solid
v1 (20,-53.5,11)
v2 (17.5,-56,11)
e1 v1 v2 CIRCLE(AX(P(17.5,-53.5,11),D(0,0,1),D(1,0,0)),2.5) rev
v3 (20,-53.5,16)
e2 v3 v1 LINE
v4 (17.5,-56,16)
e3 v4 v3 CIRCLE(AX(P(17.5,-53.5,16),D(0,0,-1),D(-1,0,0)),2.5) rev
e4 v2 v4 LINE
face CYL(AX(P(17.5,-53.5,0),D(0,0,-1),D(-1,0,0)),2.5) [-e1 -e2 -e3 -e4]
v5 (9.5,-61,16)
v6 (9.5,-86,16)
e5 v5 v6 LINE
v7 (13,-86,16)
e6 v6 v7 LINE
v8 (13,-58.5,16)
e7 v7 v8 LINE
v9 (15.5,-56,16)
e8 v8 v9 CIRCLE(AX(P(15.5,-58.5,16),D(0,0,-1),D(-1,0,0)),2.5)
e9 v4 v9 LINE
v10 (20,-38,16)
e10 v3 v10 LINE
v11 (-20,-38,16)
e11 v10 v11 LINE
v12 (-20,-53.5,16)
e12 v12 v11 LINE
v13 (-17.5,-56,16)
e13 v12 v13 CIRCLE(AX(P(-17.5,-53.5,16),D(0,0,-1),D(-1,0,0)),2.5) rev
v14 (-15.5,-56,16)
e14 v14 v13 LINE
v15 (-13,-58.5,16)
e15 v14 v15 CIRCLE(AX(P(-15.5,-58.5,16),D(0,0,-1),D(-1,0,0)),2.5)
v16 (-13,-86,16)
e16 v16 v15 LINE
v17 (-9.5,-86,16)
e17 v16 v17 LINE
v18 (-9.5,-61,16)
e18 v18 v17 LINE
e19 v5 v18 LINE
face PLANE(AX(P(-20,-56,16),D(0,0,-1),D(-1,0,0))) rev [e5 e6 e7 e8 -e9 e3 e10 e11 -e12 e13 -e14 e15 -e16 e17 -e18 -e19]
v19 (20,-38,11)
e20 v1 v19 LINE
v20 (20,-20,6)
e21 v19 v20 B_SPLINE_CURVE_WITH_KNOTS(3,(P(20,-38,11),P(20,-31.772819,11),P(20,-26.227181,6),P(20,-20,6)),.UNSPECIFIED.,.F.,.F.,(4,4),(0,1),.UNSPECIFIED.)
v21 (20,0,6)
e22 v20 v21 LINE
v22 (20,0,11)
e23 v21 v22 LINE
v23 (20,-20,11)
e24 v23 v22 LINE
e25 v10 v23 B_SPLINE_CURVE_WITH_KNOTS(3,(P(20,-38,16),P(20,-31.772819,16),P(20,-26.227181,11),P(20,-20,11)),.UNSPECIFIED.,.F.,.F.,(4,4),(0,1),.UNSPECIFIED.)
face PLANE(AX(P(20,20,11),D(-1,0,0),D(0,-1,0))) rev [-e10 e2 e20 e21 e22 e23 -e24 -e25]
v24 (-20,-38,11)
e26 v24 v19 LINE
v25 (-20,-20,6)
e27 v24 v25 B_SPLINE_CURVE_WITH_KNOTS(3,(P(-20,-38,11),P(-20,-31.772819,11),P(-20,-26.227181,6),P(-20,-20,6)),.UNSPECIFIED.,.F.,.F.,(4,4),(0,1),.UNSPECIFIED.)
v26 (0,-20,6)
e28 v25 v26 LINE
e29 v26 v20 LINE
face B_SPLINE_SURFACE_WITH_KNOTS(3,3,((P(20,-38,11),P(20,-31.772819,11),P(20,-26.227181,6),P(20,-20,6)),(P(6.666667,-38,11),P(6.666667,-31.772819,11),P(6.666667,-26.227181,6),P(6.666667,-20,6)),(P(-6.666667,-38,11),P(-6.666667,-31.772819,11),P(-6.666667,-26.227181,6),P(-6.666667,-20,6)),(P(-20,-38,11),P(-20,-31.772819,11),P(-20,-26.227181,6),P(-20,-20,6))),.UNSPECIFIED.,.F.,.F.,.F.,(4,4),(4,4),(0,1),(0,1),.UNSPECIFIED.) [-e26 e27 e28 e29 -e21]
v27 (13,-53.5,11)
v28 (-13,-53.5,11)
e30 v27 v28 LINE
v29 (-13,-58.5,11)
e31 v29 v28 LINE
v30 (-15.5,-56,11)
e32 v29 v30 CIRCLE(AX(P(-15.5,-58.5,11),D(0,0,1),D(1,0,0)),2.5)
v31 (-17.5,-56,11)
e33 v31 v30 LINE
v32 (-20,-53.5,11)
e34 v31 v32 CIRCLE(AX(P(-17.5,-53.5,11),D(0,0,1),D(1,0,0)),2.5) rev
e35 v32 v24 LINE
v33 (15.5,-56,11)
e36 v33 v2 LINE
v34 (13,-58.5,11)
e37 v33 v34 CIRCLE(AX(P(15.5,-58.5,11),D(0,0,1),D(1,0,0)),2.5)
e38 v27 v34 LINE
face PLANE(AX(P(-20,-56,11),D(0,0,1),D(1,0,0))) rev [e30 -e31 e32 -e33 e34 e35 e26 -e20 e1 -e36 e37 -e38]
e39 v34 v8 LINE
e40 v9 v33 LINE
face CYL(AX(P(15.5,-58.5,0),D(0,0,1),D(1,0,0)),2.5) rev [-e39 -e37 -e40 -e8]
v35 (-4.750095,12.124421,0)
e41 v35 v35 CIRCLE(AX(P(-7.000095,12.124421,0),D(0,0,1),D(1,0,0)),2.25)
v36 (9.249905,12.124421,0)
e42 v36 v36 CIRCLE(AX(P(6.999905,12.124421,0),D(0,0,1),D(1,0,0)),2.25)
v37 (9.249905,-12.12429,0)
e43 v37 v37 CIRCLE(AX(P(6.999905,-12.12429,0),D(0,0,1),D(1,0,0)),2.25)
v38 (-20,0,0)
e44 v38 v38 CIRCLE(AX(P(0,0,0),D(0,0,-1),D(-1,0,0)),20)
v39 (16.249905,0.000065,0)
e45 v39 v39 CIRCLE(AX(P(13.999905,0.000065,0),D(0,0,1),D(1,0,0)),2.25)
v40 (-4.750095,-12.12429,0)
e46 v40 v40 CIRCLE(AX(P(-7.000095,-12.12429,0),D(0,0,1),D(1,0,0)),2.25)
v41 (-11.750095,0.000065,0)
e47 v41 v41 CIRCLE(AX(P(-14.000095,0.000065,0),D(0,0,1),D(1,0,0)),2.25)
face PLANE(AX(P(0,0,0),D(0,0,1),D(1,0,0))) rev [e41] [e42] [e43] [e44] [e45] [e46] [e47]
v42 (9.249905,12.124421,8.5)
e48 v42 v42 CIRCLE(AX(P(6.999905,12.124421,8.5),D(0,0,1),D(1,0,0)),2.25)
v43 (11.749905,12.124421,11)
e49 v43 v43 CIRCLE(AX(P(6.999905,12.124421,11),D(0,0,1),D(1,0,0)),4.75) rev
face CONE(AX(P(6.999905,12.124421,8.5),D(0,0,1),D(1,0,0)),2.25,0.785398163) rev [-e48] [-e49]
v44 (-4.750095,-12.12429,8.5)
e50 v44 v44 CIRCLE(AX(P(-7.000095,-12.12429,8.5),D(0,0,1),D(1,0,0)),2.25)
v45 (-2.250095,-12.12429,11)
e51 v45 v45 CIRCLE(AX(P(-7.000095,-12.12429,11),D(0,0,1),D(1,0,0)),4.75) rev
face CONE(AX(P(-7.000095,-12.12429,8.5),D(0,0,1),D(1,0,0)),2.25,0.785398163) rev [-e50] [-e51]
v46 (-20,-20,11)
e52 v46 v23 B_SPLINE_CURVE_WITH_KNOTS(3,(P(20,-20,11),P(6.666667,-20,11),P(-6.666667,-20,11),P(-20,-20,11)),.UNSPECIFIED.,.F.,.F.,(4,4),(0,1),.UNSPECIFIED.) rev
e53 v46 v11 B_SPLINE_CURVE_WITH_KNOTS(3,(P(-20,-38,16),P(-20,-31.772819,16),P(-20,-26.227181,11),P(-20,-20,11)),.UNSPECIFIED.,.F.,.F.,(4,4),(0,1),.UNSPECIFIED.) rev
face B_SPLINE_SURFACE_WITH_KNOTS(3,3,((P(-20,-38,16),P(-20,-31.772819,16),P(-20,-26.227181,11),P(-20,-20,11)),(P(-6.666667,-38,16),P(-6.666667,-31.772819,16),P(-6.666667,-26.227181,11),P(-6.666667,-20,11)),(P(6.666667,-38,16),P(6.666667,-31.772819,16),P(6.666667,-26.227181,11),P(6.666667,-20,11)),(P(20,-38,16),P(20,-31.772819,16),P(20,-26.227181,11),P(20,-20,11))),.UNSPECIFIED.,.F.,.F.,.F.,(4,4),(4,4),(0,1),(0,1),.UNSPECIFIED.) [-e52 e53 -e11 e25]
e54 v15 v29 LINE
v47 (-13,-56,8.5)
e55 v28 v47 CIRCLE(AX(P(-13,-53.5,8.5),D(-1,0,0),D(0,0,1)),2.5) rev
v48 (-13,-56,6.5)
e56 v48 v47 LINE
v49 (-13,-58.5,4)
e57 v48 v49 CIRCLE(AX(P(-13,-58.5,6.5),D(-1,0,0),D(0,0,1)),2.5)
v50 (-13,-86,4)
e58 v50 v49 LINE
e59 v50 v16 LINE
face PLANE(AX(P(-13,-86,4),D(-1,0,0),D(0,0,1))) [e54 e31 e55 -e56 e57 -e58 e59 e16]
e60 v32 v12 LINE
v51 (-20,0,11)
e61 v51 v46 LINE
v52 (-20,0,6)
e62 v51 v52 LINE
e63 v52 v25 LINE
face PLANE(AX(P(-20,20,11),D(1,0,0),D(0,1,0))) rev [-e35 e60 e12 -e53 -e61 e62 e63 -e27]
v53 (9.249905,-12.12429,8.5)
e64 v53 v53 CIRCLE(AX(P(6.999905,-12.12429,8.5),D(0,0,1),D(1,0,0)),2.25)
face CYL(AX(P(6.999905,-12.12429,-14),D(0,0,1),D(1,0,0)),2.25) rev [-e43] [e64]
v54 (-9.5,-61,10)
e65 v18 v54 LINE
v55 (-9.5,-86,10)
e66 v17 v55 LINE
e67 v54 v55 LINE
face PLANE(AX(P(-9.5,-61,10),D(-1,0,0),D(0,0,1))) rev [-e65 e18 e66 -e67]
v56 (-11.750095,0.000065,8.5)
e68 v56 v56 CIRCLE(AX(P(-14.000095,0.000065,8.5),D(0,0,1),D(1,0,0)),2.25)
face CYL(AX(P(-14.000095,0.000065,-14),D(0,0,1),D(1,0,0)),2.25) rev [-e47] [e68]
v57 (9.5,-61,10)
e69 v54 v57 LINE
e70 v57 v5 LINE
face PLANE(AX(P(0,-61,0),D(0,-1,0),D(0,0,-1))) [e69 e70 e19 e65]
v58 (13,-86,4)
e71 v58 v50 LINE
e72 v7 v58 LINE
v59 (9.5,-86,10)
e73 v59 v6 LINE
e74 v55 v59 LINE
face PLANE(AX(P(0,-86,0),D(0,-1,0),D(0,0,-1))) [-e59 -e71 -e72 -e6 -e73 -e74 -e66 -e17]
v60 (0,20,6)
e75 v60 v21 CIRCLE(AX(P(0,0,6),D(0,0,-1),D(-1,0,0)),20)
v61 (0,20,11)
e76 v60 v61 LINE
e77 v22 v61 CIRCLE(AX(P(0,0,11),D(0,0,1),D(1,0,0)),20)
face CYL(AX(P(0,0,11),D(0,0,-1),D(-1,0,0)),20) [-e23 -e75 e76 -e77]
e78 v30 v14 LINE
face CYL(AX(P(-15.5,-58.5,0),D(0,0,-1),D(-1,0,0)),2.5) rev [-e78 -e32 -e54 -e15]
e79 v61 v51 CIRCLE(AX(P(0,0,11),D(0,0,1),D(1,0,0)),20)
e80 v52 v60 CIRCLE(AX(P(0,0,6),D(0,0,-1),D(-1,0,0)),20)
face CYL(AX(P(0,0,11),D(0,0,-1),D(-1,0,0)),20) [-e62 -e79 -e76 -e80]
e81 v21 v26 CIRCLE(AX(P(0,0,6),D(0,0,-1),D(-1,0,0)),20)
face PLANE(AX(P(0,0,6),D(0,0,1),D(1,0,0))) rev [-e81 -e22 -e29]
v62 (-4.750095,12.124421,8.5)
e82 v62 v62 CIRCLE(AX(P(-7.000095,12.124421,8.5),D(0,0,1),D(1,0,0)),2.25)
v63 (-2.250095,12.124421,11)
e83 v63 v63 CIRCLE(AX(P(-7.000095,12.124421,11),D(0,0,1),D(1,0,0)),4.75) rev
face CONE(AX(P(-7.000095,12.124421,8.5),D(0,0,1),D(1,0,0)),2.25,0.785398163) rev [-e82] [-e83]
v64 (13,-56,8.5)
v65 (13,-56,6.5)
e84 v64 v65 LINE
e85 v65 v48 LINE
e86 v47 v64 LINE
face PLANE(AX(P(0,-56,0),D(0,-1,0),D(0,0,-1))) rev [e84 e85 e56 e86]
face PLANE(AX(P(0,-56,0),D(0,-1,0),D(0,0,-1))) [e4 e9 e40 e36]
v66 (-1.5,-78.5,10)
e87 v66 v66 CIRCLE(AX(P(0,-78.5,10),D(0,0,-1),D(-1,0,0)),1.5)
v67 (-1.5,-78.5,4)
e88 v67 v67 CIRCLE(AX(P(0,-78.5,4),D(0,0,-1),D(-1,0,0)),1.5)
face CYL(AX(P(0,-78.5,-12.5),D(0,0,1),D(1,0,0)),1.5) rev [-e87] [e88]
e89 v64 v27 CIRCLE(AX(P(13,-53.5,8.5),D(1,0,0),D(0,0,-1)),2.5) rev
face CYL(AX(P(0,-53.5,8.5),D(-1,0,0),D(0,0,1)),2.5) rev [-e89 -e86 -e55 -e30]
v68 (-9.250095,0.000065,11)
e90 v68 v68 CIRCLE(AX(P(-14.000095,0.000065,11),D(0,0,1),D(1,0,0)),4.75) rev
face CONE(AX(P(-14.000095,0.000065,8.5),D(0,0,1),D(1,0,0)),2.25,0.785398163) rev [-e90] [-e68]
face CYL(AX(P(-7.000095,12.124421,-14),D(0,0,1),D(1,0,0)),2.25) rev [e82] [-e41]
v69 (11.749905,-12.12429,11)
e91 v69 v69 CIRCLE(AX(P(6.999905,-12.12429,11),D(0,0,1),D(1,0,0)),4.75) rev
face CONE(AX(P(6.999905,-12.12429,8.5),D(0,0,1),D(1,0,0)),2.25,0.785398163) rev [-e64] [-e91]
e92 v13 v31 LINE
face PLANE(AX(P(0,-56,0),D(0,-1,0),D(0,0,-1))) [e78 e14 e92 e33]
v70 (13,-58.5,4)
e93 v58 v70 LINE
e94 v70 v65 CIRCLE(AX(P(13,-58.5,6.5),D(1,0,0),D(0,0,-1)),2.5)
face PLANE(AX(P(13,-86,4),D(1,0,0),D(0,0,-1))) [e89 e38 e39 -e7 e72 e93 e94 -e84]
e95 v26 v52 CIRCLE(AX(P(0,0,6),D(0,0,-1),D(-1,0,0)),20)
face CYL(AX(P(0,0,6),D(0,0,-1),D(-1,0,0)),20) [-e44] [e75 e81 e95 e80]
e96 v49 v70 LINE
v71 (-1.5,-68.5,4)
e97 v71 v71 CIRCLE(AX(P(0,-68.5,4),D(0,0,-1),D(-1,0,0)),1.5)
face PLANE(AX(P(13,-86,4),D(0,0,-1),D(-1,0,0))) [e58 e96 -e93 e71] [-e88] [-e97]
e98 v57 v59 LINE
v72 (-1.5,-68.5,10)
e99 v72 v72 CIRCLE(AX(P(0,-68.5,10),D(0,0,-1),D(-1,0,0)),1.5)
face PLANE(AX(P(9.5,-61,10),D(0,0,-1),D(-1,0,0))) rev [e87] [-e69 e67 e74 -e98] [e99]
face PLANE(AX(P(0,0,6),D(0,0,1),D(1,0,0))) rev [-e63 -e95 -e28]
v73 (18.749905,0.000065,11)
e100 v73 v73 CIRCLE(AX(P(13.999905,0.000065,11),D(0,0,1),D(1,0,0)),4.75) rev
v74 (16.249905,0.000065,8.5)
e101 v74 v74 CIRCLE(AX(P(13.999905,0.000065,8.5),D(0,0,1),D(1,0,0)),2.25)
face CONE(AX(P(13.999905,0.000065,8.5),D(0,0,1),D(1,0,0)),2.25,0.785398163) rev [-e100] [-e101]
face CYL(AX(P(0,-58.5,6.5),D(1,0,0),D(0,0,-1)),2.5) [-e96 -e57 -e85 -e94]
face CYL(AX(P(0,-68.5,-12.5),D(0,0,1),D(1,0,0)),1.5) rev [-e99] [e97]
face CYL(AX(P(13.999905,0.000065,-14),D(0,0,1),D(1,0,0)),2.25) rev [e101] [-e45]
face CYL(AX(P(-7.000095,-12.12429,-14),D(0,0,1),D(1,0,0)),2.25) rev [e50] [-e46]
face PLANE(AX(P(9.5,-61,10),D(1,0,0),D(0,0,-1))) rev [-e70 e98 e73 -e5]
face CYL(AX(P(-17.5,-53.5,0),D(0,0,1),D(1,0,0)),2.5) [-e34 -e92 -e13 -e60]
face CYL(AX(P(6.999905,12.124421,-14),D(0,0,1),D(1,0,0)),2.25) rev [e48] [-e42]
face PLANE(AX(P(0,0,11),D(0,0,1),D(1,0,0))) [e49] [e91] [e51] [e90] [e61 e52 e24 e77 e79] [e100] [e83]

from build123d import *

# Parameters (mm, degrees)
SKETCH7_W           = 40
SKETCH7_H           = 40
BOSS_EXTRUDE1_DEPTH = 11
LOFT1_START         = -20
LOFT1_DEPTH         = 40
SKETCH16_W          = 49.026286786
SKETCH16_H          = 65.242270374
SKETCH16_R          = 20
CUT_EXTRUDE3_DEPTH  = 6
SKETCH17_W          = 40
SKETCH17_H          = 5
BOSS_EXTRUDE5_DEPTH = 18
SKETCH10_R          = 2.25
CUT_EXTRUDE1_DEPTH  = 25
CHAMFER1_SIZE       = 2.5
FILLET3_R           = 20
SKETCH11_W          = 26
SKETCH11_H          = 12
BOSS_EXTRUDE6_DEPTH = 30
SKETCH21_W          = 19
SKETCH21_H          = 6
CUT_EXTRUDE4_DEPTH  = 25
FILLET5_R           = 2.5
FILLET7_R           = 2.5
SKETCH22_R          = 1.5
CUT_EXTRUDE5_DEPTH  = 12.5


# Read off the part's stored shape, not the designer's step: Loft1
with BuildPart() as part:
    # Sketch7 → Boss-Extrude1 (new body)
    with BuildSketch(Plane.XY):
        Rectangle(SKETCH7_W, SKETCH7_H)
    extrude(amount=BOSS_EXTRUDE1_DEPTH)

    # Loft1 outline → Loft1 (add)
    with BuildSketch(Plane.YZ.offset(LOFT1_START)):
        with BuildLine():
            add(Edge.make_bspline(
                [(-38, 16), (-31.772819436, 16), (-26.227180564, 11), (-20, 11)],
                knots=[0, 0, 0, 0, 1, 1, 1, 1], degree=3))
            Line((-38, 16), (-38, 11))
            add(Edge.make_bspline(
                [(-38, 11), (-31.772819436, 11), (-26.227180564, 6), (-20, 6)],
                knots=[0, 0, 0, 0, 1, 1, 1, 1], degree=3))
            Line((-20, 6), (-20, 11))
        make_face()
    extrude(amount=LOFT1_DEPTH)

    # Sketch16 → Cut-Extrude3 (cut)
    with BuildSketch(Plane(origin=(0, 0, 0), x_dir=(-1, 0, 0), z_dir=(0, 0, -1))):
        Rectangle(SKETCH16_W, SKETCH16_H)
        Circle(SKETCH16_R, mode=Mode.SUBTRACT)
    extrude(amount=-CUT_EXTRUDE3_DEPTH, mode=Mode.SUBTRACT)

    # Sketch17 → Boss-Extrude5 (add)
    with BuildSketch(Plane(origin=(0, -38, 0), x_dir=(-1, 0, 0), z_dir=(0, -1, 0))):
        with Locations((0, -13.5)):
            Rectangle(SKETCH17_W, SKETCH17_H)
    extrude(amount=BOSS_EXTRUDE5_DEPTH)

    # Sketch10 → Cut-Extrude1 (cut)
    with BuildSketch(Plane.XY.offset(11)):
        with Locations((-7.00009521, 12.124420806)):
            Circle(SKETCH10_R)
        with Locations((6.99990479, 12.124420806)):
            Circle(SKETCH10_R)
        with Locations((13.99990479, 6.5153e-05)):
            Circle(SKETCH10_R)
        with Locations((6.99990479, -12.1242905)):
            Circle(SKETCH10_R)
        with Locations((-7.00009521, -12.1242905)):
            Circle(SKETCH10_R)
        with Locations((-14.00009521, 6.5153e-05)):
            Circle(SKETCH10_R)
    extrude(amount=-CUT_EXTRUDE1_DEPTH, mode=Mode.SUBTRACT)

    # Chamfer1
    chamfer1_edges = [part.edges().sort_by_distance(p)[0] for p in [
        (4.74990479, 12.124420806, 11),
        (-9.25009521, 12.124420806, 11),
        (-16.25009521, 6.5153e-05, 11),
        (-9.25009521, -12.1242905, 11),
        (4.74990479, -12.1242905, 11),
        (11.74990479, 6.5153e-05, 11),
    ]]
    chamfer(chamfer1_edges, length=CHAMFER1_SIZE)

    # Fillet3
    fillet3_edges = [part.edges().sort_by_distance(p)[0] for p in [
        (20, 20, 8.5),
        (-20, 20, 8.5),
    ]]
    fillet(fillet3_edges, radius=FILLET3_R - 0.0001)  # a hair under: the kernel refuses the full size

    # Sketch11 → Boss-Extrude6 (add)
    with BuildSketch(Plane(origin=(0, -56, -3.472963553), x_dir=(1, 0, 0), z_dir=(0, 1, 0))):
        with Locations((0, -13.472963553)):
            Rectangle(SKETCH11_W, SKETCH11_H)
    extrude(amount=-BOSS_EXTRUDE6_DEPTH)

    # Sketch21 → Cut-Extrude4 (cut)
    with BuildSketch(Plane(origin=(0, -86, 0), x_dir=(-1, 0, 0), z_dir=(0, -1, 0))):
        with Locations((0, -13)):
            Rectangle(SKETCH21_W, SKETCH21_H)
    extrude(amount=-CUT_EXTRUDE4_DEPTH, mode=Mode.SUBTRACT)

    # Fillet5
    fillet5_edges = [part.edges().sort_by_distance(p)[0] for p in [
        (-13, -56, 13.5),
        (-20, -56, 13.5),
        (13, -56, 13.5),
        (20, -56, 13.5),
    ]]
    fillet(fillet5_edges, radius=FILLET5_R)

    # Fillet7
    fillet7_edges = [part.edges().sort_by_distance(p)[0] for p in [
        (0, -56, 11),
        (0, -56, 4),
    ]]
    fillet(fillet7_edges, radius=FILLET7_R)

    # Sketch22 → Cut-Extrude5 (cut, symmetric)
    with BuildSketch(Plane.XY):
        with Locations(Location((0, -68.5, 0), (0, 0, 180))):
            Circle(SKETCH22_R)
        with Locations(Location((0, -78.5, 0), (0, 0, 180))):
            Circle(SKETCH22_R)
    extrude(amount=CUT_EXTRUDE5_DEPTH, both=True, mode=Mode.SUBTRACT)


solid = part.part
